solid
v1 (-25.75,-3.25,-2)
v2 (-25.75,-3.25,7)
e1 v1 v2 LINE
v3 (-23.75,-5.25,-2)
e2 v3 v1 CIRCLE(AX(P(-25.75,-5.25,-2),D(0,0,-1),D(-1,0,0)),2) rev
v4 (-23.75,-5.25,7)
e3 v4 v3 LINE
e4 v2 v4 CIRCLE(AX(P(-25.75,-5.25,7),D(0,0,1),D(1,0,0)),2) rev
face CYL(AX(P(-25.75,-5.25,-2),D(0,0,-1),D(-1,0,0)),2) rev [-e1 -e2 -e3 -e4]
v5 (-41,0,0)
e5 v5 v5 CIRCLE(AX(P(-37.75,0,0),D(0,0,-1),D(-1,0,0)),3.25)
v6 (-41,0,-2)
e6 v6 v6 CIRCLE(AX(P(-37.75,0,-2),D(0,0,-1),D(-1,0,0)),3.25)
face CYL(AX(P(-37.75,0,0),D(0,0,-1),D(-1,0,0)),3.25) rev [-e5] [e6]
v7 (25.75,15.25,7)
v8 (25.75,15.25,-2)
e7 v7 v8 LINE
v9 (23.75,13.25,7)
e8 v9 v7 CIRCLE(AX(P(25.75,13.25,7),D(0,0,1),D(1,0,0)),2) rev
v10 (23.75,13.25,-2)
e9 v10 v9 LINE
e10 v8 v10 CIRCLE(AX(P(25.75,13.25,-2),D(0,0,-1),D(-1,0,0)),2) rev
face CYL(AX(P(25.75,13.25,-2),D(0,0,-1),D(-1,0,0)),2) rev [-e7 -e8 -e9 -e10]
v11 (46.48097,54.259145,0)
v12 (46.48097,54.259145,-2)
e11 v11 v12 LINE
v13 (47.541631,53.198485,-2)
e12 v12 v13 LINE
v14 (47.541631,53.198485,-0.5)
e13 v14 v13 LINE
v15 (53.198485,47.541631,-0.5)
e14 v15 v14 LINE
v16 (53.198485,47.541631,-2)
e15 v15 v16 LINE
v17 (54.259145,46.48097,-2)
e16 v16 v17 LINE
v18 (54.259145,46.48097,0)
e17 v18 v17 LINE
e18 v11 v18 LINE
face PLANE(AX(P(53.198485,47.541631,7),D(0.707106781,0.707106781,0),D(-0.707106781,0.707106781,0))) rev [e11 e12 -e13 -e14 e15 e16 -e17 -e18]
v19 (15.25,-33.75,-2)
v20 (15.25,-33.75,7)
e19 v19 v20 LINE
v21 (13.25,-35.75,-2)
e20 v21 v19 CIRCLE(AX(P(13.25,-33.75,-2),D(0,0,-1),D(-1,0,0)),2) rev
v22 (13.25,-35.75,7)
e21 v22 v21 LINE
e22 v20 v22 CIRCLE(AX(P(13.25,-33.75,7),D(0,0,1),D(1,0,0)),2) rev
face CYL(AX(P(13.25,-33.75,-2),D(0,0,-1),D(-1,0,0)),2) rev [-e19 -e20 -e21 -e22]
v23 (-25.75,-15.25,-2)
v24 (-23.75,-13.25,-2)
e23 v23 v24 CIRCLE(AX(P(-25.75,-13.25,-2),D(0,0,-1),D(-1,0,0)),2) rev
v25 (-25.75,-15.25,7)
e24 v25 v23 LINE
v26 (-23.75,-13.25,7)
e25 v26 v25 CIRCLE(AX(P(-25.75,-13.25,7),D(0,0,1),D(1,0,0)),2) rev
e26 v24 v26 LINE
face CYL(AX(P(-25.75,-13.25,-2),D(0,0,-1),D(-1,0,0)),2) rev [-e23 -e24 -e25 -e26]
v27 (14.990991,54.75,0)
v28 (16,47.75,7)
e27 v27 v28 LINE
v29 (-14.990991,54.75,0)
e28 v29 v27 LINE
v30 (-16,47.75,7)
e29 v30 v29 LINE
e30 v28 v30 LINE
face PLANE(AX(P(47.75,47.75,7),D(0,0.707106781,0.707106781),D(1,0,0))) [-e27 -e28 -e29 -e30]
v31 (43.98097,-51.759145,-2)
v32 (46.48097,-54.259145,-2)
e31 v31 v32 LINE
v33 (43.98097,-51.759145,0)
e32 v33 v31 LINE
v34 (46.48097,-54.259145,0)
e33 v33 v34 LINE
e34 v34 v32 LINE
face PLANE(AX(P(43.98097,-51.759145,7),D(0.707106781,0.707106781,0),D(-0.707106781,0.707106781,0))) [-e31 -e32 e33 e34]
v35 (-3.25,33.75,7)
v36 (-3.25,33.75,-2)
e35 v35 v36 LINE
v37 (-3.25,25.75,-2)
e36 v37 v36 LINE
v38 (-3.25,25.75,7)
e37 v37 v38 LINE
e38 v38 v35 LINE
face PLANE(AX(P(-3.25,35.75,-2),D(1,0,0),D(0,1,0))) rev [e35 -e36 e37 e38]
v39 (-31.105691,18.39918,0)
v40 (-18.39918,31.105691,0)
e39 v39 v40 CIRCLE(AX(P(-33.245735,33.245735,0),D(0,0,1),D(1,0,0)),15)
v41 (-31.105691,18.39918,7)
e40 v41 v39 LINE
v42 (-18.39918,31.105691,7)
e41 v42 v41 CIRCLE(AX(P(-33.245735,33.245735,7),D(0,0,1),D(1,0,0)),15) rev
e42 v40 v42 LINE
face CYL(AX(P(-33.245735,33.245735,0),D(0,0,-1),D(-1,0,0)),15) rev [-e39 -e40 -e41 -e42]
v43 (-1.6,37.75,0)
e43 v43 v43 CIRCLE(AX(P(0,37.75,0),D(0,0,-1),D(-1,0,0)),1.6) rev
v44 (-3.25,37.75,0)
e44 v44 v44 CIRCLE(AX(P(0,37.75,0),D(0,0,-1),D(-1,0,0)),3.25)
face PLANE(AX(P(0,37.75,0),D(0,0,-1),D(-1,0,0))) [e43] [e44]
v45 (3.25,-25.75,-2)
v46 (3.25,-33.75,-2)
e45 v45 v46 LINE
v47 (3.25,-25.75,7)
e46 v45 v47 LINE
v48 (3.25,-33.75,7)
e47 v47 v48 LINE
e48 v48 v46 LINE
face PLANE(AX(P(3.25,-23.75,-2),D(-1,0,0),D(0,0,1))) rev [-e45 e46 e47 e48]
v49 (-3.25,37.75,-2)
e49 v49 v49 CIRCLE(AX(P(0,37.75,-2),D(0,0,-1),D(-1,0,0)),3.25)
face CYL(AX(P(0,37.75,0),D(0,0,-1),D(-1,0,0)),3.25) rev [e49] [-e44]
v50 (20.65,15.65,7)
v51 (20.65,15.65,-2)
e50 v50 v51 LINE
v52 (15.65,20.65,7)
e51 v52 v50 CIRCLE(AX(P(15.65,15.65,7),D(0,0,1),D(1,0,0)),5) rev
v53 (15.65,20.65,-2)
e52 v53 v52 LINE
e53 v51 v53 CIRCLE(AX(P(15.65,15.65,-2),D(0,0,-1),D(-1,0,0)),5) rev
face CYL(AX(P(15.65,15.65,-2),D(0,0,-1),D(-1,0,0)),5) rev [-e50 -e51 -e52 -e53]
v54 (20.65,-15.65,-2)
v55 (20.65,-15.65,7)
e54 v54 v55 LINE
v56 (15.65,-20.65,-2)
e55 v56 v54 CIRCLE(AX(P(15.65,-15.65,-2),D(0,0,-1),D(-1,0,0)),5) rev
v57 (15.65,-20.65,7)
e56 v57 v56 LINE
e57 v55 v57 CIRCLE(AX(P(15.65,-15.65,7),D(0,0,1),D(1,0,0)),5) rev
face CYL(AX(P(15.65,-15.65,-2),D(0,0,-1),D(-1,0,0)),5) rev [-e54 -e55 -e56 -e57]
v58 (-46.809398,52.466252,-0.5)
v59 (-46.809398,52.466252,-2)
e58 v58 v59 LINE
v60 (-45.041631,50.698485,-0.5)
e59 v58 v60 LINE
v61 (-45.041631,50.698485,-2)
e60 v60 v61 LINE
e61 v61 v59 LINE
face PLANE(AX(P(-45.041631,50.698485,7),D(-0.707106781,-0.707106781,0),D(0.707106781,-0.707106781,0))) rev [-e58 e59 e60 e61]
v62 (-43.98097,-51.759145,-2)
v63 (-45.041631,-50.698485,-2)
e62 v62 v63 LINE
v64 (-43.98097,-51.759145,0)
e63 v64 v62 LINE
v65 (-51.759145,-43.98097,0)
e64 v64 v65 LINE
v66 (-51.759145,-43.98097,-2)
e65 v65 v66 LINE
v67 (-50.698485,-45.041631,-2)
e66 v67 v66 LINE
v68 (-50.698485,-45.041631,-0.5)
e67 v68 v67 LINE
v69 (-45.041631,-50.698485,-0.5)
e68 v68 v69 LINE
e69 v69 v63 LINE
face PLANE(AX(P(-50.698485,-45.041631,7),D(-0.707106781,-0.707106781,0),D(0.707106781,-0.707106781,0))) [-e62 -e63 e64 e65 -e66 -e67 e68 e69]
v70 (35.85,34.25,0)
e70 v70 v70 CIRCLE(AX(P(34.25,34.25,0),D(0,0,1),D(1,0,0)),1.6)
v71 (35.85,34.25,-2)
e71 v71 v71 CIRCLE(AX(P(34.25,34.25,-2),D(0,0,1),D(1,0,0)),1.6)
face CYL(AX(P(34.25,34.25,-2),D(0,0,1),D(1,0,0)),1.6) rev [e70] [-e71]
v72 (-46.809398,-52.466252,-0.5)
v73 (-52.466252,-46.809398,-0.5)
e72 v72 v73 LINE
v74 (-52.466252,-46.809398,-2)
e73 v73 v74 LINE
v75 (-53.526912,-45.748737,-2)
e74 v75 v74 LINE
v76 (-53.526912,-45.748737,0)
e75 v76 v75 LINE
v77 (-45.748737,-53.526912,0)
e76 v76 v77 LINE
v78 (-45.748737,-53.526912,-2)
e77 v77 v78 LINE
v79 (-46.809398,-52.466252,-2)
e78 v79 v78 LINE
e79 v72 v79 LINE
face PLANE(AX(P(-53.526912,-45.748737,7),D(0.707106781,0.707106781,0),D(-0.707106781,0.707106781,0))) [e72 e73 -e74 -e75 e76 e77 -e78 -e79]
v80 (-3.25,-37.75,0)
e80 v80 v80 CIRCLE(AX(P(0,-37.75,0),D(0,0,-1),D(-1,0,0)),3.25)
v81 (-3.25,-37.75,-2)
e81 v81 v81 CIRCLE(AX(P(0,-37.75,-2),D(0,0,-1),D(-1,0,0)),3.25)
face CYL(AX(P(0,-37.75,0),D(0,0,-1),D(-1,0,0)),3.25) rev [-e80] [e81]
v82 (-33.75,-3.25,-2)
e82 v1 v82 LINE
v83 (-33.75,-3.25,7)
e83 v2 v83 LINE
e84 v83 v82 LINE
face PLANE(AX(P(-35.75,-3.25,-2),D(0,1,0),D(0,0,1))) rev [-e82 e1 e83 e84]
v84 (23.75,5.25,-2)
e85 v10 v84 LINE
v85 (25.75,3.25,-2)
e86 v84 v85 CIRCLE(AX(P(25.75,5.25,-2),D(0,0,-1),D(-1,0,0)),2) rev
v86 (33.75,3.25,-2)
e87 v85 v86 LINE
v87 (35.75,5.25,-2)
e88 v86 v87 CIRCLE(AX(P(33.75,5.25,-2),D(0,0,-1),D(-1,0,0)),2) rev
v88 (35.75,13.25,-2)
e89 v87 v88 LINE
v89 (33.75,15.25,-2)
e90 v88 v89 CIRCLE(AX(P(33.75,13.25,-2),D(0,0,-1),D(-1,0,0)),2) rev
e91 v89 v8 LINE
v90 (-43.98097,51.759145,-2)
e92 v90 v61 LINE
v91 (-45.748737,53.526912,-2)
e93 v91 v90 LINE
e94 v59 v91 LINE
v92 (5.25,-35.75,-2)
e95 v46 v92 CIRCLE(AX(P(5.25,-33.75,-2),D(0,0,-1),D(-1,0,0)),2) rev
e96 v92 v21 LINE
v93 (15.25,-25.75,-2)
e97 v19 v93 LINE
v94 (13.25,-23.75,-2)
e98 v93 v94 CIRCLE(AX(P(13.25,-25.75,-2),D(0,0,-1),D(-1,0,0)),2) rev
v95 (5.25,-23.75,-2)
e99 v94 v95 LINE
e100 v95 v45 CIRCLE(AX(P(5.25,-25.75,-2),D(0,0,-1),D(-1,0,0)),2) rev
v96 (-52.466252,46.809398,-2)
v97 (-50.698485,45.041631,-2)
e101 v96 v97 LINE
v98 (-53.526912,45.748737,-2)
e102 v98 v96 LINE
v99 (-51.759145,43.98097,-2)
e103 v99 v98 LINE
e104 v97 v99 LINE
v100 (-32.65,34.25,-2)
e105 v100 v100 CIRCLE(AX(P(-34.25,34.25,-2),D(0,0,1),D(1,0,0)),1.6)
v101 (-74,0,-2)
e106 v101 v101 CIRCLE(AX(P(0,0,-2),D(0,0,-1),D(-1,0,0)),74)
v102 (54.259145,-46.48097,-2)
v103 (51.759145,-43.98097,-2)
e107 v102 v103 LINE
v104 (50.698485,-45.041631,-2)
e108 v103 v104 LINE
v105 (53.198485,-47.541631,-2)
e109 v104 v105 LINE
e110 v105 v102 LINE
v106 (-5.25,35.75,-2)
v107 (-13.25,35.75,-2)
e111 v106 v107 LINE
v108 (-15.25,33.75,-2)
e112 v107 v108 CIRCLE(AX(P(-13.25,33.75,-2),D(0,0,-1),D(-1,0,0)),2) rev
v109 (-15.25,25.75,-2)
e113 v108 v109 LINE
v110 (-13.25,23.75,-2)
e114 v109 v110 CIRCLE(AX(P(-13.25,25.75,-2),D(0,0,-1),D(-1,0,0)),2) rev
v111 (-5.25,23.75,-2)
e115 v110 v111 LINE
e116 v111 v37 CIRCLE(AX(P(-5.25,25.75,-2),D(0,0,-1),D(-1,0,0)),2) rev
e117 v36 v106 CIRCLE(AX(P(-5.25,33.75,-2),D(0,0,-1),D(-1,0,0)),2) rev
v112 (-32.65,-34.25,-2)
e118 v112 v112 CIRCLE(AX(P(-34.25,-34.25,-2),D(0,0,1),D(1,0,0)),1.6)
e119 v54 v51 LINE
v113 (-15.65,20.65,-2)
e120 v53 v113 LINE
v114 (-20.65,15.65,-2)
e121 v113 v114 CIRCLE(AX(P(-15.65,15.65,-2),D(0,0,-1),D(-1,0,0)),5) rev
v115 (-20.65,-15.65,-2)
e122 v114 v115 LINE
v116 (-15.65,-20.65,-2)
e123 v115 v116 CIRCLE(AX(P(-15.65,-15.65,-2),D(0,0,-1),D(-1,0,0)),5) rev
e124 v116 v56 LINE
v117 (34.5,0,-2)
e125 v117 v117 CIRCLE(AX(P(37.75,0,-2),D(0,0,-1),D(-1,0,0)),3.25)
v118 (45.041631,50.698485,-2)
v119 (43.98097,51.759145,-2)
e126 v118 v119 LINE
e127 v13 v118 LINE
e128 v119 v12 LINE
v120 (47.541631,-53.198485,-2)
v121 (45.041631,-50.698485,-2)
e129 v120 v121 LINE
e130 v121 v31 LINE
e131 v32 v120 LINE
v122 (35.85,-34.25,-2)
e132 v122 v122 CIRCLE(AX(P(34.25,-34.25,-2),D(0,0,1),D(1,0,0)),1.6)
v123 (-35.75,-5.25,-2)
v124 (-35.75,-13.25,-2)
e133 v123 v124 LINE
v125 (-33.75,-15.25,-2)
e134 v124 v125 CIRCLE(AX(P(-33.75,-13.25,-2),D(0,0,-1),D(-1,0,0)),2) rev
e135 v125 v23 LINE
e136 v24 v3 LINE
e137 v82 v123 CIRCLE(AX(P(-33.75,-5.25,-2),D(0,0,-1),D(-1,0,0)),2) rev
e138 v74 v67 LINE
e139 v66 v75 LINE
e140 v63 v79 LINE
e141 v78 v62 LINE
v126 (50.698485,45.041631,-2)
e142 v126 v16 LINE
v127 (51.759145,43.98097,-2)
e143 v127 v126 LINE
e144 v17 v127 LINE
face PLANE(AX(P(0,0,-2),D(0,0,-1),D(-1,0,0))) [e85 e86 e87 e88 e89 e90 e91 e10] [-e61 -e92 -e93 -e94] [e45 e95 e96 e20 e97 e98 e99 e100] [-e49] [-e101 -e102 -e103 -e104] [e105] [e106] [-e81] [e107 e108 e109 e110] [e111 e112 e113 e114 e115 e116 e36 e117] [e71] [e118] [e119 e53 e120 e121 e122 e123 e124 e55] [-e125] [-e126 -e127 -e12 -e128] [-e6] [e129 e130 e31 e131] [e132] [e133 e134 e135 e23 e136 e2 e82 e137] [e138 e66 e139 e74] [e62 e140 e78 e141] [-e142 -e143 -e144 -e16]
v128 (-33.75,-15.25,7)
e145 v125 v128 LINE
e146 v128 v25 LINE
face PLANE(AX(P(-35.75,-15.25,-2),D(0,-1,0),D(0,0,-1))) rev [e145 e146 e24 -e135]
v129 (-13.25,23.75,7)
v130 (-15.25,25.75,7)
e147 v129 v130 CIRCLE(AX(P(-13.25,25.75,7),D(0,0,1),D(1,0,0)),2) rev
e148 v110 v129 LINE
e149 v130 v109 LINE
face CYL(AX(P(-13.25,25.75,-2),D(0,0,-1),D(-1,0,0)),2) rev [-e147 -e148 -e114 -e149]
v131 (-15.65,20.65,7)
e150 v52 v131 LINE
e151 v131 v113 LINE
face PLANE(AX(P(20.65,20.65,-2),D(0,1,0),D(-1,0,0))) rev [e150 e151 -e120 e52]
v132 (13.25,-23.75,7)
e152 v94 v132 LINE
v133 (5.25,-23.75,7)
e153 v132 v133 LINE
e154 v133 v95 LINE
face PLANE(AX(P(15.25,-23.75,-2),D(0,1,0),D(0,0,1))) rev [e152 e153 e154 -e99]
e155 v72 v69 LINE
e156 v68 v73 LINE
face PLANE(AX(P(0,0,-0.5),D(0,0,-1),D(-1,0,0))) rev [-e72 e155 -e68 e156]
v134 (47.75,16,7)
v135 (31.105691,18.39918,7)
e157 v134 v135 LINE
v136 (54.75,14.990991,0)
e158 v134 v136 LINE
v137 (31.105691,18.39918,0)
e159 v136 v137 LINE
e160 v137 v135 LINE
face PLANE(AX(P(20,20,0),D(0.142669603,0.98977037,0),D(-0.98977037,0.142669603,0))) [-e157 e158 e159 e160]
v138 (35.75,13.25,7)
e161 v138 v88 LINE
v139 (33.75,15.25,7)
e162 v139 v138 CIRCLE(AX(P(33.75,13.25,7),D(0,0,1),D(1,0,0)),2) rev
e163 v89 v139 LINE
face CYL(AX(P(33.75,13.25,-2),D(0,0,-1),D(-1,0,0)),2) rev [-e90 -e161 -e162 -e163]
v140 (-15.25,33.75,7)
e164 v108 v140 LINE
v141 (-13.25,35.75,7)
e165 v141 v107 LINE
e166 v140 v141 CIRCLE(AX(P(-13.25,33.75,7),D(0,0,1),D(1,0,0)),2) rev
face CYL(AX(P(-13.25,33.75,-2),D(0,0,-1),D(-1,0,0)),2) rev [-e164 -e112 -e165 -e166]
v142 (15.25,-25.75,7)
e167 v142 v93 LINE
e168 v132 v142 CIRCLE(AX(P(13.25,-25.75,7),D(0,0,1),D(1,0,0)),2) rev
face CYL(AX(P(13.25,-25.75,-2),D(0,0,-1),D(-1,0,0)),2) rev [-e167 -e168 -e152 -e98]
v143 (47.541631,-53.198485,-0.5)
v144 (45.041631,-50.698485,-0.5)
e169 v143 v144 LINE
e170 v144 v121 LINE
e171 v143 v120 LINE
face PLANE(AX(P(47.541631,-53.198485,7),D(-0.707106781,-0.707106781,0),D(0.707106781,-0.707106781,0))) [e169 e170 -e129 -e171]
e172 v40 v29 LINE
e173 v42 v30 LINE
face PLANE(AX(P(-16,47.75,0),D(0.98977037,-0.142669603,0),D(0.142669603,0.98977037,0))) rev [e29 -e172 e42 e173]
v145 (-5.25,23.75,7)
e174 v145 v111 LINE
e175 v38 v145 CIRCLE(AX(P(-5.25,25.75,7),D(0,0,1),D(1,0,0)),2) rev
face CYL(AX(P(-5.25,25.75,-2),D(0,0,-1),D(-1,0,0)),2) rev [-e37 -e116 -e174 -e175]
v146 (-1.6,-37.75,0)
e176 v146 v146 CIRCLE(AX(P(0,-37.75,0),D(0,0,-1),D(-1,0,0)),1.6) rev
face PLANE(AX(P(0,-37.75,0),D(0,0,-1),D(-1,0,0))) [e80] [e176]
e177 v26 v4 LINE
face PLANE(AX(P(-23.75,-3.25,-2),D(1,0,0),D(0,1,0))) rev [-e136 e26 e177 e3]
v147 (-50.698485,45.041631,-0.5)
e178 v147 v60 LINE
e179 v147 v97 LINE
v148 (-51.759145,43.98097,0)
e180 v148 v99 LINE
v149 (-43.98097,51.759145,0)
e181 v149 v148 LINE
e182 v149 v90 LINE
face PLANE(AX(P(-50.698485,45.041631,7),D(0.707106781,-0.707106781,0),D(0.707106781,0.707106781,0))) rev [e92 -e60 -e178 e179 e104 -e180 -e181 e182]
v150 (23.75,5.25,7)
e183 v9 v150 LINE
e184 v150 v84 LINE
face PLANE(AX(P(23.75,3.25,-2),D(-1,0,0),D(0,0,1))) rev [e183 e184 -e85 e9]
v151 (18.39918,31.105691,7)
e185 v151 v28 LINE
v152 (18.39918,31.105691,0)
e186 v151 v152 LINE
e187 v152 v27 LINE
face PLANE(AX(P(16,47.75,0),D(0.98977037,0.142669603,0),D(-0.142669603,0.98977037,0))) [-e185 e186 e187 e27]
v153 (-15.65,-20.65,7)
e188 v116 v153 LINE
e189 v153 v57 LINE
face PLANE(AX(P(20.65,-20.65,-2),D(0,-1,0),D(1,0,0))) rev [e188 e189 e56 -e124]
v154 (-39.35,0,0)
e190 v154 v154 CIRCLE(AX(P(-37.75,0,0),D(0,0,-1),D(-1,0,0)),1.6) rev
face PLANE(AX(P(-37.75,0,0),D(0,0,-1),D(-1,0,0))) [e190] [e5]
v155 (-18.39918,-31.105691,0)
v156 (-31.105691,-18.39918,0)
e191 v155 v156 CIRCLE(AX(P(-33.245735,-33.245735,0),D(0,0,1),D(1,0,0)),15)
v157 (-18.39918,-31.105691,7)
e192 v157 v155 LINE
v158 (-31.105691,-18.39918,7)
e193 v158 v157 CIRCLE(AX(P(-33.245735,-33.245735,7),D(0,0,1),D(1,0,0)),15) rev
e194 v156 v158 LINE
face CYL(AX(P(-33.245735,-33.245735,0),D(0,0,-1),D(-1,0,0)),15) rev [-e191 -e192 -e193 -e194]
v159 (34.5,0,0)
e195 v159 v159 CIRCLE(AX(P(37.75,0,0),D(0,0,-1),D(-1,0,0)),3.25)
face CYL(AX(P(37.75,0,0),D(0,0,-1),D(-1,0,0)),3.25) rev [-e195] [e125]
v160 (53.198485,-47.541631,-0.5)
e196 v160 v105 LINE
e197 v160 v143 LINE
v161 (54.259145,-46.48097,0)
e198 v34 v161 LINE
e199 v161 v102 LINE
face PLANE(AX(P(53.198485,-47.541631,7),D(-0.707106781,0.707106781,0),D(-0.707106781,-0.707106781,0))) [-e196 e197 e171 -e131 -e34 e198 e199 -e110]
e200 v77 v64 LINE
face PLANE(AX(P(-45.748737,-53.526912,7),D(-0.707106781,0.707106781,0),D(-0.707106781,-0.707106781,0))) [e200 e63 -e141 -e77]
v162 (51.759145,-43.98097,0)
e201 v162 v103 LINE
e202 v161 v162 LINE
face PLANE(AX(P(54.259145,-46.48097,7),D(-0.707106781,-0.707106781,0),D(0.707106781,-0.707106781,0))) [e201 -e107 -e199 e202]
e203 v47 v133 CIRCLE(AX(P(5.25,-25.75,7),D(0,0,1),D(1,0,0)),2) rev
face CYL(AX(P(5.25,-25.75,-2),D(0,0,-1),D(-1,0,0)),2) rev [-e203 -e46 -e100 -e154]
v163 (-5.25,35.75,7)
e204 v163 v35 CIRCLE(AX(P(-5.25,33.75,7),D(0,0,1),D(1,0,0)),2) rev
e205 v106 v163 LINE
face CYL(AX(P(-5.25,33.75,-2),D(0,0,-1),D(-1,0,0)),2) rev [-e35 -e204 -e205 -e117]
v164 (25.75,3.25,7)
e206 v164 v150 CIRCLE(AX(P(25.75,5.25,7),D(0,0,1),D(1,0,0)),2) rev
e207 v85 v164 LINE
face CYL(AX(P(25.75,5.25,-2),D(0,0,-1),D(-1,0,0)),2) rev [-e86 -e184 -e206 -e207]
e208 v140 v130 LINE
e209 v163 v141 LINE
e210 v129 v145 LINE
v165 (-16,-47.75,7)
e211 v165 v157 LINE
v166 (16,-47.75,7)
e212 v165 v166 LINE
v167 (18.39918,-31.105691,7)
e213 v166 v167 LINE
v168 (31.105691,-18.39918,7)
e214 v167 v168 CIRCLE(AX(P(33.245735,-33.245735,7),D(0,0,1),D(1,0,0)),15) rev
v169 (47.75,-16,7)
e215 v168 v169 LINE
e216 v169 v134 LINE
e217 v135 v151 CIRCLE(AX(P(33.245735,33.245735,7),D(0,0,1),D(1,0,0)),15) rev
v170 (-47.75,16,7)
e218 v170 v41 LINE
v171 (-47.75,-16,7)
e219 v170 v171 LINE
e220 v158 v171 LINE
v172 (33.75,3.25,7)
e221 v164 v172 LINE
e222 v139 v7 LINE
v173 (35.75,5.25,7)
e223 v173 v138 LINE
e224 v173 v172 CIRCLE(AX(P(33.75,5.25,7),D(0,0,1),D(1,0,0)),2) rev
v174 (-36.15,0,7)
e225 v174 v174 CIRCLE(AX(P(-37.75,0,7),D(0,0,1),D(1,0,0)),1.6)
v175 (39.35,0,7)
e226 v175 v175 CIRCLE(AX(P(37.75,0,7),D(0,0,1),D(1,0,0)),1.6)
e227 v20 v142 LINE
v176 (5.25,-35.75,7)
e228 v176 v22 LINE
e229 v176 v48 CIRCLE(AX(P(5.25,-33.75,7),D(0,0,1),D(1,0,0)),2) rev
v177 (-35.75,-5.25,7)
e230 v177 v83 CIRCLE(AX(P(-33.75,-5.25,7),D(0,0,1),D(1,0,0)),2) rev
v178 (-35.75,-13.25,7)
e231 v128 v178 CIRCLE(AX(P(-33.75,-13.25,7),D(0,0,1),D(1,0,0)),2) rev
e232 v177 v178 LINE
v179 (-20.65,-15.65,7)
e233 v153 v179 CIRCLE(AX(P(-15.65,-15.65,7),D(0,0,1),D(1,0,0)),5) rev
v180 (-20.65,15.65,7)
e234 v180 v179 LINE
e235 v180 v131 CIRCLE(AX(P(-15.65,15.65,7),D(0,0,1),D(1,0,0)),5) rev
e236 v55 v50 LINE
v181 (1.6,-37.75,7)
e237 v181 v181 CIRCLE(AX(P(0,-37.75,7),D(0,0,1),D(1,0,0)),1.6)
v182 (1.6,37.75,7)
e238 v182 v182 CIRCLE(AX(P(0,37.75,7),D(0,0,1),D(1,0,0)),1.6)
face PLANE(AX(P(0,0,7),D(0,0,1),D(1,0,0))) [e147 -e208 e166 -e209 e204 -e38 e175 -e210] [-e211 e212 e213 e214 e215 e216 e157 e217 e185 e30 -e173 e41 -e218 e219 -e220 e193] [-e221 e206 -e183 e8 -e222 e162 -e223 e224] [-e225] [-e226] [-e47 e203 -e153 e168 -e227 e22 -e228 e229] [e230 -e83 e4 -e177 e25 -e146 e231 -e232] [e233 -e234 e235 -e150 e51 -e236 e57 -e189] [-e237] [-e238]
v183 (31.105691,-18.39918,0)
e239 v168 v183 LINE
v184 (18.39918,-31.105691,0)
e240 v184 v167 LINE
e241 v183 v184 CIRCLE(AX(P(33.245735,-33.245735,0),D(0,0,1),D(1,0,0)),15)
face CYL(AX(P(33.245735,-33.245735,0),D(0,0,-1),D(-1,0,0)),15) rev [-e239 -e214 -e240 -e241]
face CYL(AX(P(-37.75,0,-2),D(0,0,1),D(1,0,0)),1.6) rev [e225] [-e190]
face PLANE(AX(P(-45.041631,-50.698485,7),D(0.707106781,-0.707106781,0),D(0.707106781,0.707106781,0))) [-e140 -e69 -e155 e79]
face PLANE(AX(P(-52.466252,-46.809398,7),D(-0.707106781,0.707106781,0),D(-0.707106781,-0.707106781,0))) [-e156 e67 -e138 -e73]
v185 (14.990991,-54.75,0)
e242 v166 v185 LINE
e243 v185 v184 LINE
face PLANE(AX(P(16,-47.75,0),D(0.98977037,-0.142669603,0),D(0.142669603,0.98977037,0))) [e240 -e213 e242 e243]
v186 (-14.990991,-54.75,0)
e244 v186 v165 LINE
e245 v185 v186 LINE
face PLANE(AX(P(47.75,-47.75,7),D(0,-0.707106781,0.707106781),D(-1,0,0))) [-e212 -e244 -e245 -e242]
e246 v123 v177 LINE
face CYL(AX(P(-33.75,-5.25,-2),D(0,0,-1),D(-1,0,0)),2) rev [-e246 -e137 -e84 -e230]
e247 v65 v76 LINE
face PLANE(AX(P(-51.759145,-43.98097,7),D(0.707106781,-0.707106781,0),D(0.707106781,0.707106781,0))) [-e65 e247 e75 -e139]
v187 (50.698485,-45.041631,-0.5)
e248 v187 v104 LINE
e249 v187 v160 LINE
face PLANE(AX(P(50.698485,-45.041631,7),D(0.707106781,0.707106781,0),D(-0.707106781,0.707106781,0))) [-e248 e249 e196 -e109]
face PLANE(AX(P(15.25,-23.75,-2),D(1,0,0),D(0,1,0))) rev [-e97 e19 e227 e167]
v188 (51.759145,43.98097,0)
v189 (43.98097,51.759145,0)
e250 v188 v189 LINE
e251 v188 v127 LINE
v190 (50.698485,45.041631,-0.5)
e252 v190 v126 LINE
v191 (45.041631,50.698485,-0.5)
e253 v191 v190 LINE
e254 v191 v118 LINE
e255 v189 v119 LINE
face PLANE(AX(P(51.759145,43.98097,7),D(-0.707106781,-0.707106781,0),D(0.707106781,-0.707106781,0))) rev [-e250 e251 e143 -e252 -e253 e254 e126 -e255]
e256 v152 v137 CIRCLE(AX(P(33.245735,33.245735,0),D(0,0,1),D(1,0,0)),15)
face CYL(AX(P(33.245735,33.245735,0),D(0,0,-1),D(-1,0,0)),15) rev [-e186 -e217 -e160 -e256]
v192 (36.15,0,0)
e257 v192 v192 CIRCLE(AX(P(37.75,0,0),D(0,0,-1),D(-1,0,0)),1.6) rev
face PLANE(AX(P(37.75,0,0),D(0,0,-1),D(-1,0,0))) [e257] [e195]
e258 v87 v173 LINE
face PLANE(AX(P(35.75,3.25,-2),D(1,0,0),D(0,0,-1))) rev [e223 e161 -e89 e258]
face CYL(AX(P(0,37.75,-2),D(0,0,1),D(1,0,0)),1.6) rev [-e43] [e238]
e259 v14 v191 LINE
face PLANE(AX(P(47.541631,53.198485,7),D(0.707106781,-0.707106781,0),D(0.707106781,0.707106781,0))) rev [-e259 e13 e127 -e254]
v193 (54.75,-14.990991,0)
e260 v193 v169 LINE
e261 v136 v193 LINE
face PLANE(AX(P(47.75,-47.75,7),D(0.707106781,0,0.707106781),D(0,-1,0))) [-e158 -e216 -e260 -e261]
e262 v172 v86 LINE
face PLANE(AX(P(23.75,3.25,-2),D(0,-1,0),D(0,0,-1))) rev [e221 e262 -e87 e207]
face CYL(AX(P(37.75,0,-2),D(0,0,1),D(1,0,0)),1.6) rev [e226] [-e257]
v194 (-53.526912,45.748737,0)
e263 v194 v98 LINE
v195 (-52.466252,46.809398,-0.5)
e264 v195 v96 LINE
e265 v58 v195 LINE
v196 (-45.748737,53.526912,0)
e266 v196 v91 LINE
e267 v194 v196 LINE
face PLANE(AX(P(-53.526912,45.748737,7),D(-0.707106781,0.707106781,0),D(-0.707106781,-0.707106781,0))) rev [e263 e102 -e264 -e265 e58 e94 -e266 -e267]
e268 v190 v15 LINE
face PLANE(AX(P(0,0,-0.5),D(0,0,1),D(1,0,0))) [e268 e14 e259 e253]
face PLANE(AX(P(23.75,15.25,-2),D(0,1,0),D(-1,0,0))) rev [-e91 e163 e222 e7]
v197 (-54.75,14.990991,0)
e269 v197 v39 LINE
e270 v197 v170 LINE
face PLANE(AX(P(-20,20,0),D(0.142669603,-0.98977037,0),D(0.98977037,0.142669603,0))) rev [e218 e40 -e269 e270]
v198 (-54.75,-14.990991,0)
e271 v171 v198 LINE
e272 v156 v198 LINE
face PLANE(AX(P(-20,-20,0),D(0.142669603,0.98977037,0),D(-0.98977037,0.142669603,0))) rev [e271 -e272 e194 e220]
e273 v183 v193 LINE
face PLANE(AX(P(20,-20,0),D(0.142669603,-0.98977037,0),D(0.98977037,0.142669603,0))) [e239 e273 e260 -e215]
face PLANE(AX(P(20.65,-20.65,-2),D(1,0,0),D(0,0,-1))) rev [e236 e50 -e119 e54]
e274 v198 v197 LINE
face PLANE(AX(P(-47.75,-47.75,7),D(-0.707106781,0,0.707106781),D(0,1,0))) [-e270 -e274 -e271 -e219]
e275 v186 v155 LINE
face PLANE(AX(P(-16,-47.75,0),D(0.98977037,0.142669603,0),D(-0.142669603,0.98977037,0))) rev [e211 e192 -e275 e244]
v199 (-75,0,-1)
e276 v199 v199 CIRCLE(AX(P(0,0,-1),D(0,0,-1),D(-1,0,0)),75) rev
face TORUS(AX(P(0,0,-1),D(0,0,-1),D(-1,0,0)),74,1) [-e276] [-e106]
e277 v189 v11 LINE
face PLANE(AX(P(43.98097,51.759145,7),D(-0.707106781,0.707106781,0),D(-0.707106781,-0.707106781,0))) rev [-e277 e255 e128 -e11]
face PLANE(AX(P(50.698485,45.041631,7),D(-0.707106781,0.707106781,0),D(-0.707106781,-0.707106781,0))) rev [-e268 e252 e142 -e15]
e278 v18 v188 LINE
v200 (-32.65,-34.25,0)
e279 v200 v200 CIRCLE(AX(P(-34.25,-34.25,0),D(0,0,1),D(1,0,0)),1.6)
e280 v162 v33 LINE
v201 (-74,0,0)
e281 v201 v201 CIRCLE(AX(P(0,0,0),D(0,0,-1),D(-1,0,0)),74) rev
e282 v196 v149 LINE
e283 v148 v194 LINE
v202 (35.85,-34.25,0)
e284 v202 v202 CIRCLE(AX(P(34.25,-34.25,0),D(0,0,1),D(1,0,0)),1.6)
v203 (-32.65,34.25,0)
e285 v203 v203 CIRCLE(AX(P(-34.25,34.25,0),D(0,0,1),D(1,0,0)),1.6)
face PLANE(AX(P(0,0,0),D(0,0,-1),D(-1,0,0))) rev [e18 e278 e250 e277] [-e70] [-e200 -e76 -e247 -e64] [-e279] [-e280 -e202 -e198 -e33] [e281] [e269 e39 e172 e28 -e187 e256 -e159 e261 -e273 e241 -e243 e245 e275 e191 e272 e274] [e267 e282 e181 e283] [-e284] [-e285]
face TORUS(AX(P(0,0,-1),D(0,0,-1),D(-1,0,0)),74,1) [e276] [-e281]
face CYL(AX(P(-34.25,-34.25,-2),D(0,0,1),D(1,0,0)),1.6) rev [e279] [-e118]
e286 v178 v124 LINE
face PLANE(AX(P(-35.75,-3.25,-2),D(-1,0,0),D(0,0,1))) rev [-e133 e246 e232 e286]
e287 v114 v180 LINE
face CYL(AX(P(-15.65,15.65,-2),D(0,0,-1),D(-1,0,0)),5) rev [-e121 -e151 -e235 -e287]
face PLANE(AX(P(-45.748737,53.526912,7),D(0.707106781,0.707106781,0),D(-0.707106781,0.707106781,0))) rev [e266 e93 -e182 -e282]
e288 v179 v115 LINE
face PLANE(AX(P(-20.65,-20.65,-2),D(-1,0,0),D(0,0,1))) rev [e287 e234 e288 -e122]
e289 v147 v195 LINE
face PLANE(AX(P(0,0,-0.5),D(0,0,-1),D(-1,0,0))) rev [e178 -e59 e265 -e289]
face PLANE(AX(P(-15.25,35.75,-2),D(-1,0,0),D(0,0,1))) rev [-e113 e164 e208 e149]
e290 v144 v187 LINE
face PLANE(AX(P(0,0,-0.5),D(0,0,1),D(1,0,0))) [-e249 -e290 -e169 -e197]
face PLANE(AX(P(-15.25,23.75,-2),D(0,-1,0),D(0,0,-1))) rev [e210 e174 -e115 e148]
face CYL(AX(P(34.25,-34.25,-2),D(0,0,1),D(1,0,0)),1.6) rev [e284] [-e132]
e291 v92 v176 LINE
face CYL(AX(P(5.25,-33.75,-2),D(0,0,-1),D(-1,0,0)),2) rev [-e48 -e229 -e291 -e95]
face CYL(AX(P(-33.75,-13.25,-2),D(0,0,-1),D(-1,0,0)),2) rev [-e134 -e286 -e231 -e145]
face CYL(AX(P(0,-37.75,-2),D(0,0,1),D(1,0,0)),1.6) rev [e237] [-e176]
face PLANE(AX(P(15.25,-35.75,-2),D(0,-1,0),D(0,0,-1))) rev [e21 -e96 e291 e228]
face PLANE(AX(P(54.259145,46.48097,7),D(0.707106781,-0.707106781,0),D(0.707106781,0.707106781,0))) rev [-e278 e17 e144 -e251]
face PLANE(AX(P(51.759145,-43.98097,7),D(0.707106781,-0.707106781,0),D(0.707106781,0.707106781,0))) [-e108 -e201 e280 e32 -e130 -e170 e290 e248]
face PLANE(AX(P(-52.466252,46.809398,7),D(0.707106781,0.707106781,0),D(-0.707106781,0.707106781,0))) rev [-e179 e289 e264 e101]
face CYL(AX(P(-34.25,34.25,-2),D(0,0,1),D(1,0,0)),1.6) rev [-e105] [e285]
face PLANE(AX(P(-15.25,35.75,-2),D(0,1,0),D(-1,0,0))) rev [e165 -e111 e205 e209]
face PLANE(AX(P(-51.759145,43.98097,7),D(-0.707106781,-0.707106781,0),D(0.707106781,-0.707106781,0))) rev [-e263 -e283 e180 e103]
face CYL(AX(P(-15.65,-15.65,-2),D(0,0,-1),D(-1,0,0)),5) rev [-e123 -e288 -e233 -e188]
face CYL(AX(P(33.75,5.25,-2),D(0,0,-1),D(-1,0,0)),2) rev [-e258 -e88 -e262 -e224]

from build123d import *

# Parameters (mm, degrees)
SKETCH_1_W          = 95.5
SKETCH_1_H          = 95.5
EXTRUDE_1_DEPTH     = 7
CUT_EXTRUDE_1_DEPTH = 68.890536896
FILLET_2_R          = 15
SKETCH_3_R          = 75
EXTRUDE_2_DEPTH     = 2
CHAMFER_1_SIZE      = 7
FILLET_1_R          = 1
SKETCH_5_R          = 1.6
CUT_EXTRUDE_2_DEPTH = 107.296754489
SKETCH_6_W          = 42
SKETCH_6_H          = 42
CUT_EXTRUDE_3_DEPTH = 107.447170066
SKETCH_7_R          = 1.6
CUT_EXTRUDE_4_DEPTH = 107.447170066
CUT_EXTRUDE_5_DEPTH = 107.447170066
CUT_EXTRUDE_6_DEPTH = 0.5
SKETCH_10_W         = 12
SKETCH_10_H         = 12
CUT_EXTRUDE_7_DEPTH = 107.447170066
SKETCH_11_W         = 42
SKETCH_11_H         = 42
EXTRUDE_4_DEPTH     = 9
FILLET_3_R          = 2
SKETCH_12_W         = 41.3
SKETCH_12_H         = 41.3
CUT_EXTRUDE_8_DEPTH = 107.447170066
FILLET_4_R          = 5
SKETCH_13_R         = 3.25
CUT_EXTRUDE_9_DEPTH = 2


with BuildPart() as part:
    # ｽｹｯﾁ1 → ﾎﾞｽ - 押し出し1 (new body)
    with BuildSketch(Plane.XY):
        Rectangle(SKETCH_1_W, SKETCH_1_H)
    extrude(amount=EXTRUDE_1_DEPTH)

    # ｽｹｯﾁ2 → ｶｯﾄ - 押し出し1 (cut, through all)
    with BuildSketch(Plane.XY.offset(7)):
        Polygon((-16, 47.75), (-20, 20), (-47.75, 16), (-47.75, 47.75), align=None)
        Polygon((-16, -47.75), (-20, -20), (-47.75, -16), (-47.75, -47.75), align=None)
    cut_extrude_1 = extrude(amount=-CUT_EXTRUDE_1_DEPTH, mode=Mode.SUBTRACT)

    # ﾐﾗｰ1: ｶｯﾄ - 押し出し1 across plane
    add(cut_extrude_1.mirror(Plane(origin=(0, 0, 0), x_dir=(0, 0, 1), z_dir=(1, 0, 0))), mode=Mode.SUBTRACT)

    # ﾌｨﾚｯﾄ2
    fillet_2_edges = [part.edges().sort_by_distance(p)[0] for p in [
        (-20, 20, 3.5),
        (-20, -20, 3.5),
        (20, 20, 3.5),
        (20, -20, 3.5),
    ]]
    fillet(fillet_2_edges, radius=FILLET_2_R)

    # ｽｹｯﾁ3 → ﾎﾞｽ - 押し出し2 (add)
    with BuildSketch(Plane(origin=(0, 0, 0), x_dir=(-1, 0, 0), z_dir=(0, 0, -1))):
        Circle(SKETCH_3_R)
    extrude(amount=EXTRUDE_2_DEPTH)

    # 面取り1
    chamfer_1_edges = [part.edges().sort_by_distance(p)[0] for p in [
        (0, 47.75, 0),
        (47.75, 0, 0),
        (0, -47.75, 0),
        (-47.75, 0, 0),
    ]]
    chamfer(chamfer_1_edges, length=CHAMFER_1_SIZE - 0.0001)  # a hair under: the kernel refuses the full size

    # ﾌｨﾚｯﾄ1
    fillet_1_edges = [part.edges().sort_by_distance(p)[0] for p in [
        (75, 0, 0),
        (75, 0, -2),
    ]]
    fillet(fillet_1_edges, radius=FILLET_1_R - 0.0001)  # a hair under: the kernel refuses the full size

    # ｽｹｯﾁ5 → ｶｯﾄ - 押し出し2 (cut, through all)
    with BuildSketch(Plane.XY):
        with Locations((-34.25, 34.25)):
            Circle(SKETCH_5_R)
        with Locations((34.25, 34.25)):
            Circle(SKETCH_5_R)
        with Locations((34.25, -34.25)):
            Circle(SKETCH_5_R)
        with Locations((-34.25, -34.25)):
            Circle(SKETCH_5_R)
    extrude(amount=-CUT_EXTRUDE_2_DEPTH, mode=Mode.SUBTRACT)

    # ｽｹｯﾁ6 → ｶｯﾄ - 押し出し3 (cut, through all)
    with BuildSketch(Plane.XY.offset(7)):
        Rectangle(SKETCH_6_W, SKETCH_6_H)
    extrude(amount=-CUT_EXTRUDE_3_DEPTH, mode=Mode.SUBTRACT)

    # ｽｹｯﾁ7 → ｶｯﾄ - 押し出し4 (cut, through all)
    with BuildSketch(Plane.XY.offset(7)):
        with Locations((0, 37.75)):
            Circle(SKETCH_7_R)
        with Locations((-37.75, 0)):
            Circle(SKETCH_7_R)
        with Locations((37.75, 0)):
            Circle(SKETCH_7_R)
        with Locations((0, -37.75)):
            Circle(SKETCH_7_R)
    extrude(amount=-CUT_EXTRUDE_4_DEPTH, mode=Mode.SUBTRACT)

    # ｽｹｯﾁ8 → ｶｯﾄ - 押し出し5 (cut, through all)
    with BuildSketch(Plane(origin=(0, 0, -2), x_dir=(-1, 0, 0), z_dir=(0, 0, -1))):
        Polygon((-47.54163056, 53.19848481), (-45.04163056, 50.69848481), (-43.980970389, 51.759144982), (-46.480970389, 54.259144982), align=None)
        Polygon((-53.19848481, 47.54163056), (-54.259144982, 46.480970389), (-51.759144982, 43.980970389), (-50.69848481, 45.04163056), align=None)
        Polygon((45.748737342, 53.526911935), (43.980970389, 51.759144982), (45.04163056, 50.69848481), (46.809397513, 52.466251763), align=None)
        Polygon((52.466251763, 46.809397513), (50.69848481, 45.04163056), (51.759144982, 43.980970389), (53.526911935, 45.748737342), align=None)
    cut_extrude_5 = extrude(amount=-CUT_EXTRUDE_5_DEPTH, mode=Mode.SUBTRACT)

    # ｽｹｯﾁ9 → ｶｯﾄ - 押し出し6 (cut)
    with BuildSketch(Plane.XY):
        Polygon((-53.526911935, 45.748737342), (-45.748737342, 53.526911935), (-43.980970389, 51.759144982), (-51.759144982, 43.980970389), align=None)
        Polygon((46.480970389, 54.259144982), (43.980970389, 51.759144982), (51.759144982, 43.980970389), (54.259144982, 46.480970389), align=None)
    cut_extrude_6 = extrude(amount=-CUT_EXTRUDE_6_DEPTH, mode=Mode.SUBTRACT)

    # ﾐﾗｰ2: ｶｯﾄ - 押し出し5, ｶｯﾄ - 押し出し6 across plane
    add(cut_extrude_5.mirror(Plane.ZX), mode=Mode.SUBTRACT)
    add(cut_extrude_6.mirror(Plane.ZX), mode=Mode.SUBTRACT)

    # ｽｹｯﾁ10 → ｶｯﾄ - 押し出し7 (cut, through all)
    with BuildSketch(Plane.XY.offset(7)):
        with Locations((-29.75, -9.25)):
            Rectangle(SKETCH_10_W, SKETCH_10_H)
        with Locations((-9.25, 29.75)):
            Rectangle(SKETCH_10_W, SKETCH_10_H)
        with Locations((29.75, 9.25)):
            Rectangle(SKETCH_10_W, SKETCH_10_H)
        with Locations((9.25, -29.75)):
            Rectangle(SKETCH_10_W, SKETCH_10_H)
    extrude(amount=-CUT_EXTRUDE_7_DEPTH, mode=Mode.SUBTRACT)

    # ｽｹｯﾁ11 → ﾎﾞｽ - 押し出し4 (add, through all)
    with BuildSketch(Plane(origin=(0, 0, -2), x_dir=(-1, 0, 0), z_dir=(0, 0, -1))):
        Rectangle(SKETCH_11_W, SKETCH_11_H)
    extrude(amount=-EXTRUDE_4_DEPTH)

    # ﾌｨﾚｯﾄ3
    fillet_3_edges = [part.edges().sort_by_distance(p)[0] for p in [
        (-35.75, -15.25, 2.5),
        (-35.75, -3.25, 2.5),
        (-23.75, -3.25, 2.5),
        (-23.75, -15.25, 2.5),
        (-15.25, 23.75, 2.5),
        (-15.25, 35.75, 2.5),
        (-3.25, 35.75, 2.5),
        (-3.25, 23.75, 2.5),
        (23.75, 3.25, 2.5),
        (23.75, 15.25, 2.5),
        (35.75, 15.25, 2.5),
        (35.75, 3.25, 2.5),
        (15.25, -23.75, 2.5),
        (15.25, -35.75, 2.5),
        (3.25, -35.75, 2.5),
        (3.25, -23.75, 2.5),
    ]]
    fillet(fillet_3_edges, radius=FILLET_3_R)

    # ｽｹｯﾁ12 → ｶｯﾄ - 押し出し8 (cut, through all)
    with BuildSketch(Plane.XY.offset(7)):
        Rectangle(SKETCH_12_W, SKETCH_12_H)
    extrude(amount=-CUT_EXTRUDE_8_DEPTH, mode=Mode.SUBTRACT)

    # ﾌｨﾚｯﾄ4
    fillet_4_edges = [part.edges().sort_by_distance(p)[0] for p in [
        (-20.65, -20.65, 2.5),
        (-20.65, 20.65, 2.5),
        (20.65, 20.65, 2.5),
        (20.65, -20.65, 2.5),
    ]]
    fillet(fillet_4_edges, radius=FILLET_4_R)

    # ｽｹｯﾁ13 → ｶｯﾄ - 押し出し9 (cut)
    with BuildSketch(Plane(origin=(0, 0, -2), x_dir=(-1, 0, 0), z_dir=(0, 0, -1))):
        with Locations((-37.75, 0)):
            Circle(SKETCH_13_R)
        with Locations((0, -37.75)):
            Circle(SKETCH_13_R)
        with Locations((37.75, 0)):
            Circle(SKETCH_13_R)
        with Locations((0, 37.75)):
            Circle(SKETCH_13_R)
    extrude(amount=-CUT_EXTRUDE_9_DEPTH, mode=Mode.SUBTRACT)


solid = part.part
